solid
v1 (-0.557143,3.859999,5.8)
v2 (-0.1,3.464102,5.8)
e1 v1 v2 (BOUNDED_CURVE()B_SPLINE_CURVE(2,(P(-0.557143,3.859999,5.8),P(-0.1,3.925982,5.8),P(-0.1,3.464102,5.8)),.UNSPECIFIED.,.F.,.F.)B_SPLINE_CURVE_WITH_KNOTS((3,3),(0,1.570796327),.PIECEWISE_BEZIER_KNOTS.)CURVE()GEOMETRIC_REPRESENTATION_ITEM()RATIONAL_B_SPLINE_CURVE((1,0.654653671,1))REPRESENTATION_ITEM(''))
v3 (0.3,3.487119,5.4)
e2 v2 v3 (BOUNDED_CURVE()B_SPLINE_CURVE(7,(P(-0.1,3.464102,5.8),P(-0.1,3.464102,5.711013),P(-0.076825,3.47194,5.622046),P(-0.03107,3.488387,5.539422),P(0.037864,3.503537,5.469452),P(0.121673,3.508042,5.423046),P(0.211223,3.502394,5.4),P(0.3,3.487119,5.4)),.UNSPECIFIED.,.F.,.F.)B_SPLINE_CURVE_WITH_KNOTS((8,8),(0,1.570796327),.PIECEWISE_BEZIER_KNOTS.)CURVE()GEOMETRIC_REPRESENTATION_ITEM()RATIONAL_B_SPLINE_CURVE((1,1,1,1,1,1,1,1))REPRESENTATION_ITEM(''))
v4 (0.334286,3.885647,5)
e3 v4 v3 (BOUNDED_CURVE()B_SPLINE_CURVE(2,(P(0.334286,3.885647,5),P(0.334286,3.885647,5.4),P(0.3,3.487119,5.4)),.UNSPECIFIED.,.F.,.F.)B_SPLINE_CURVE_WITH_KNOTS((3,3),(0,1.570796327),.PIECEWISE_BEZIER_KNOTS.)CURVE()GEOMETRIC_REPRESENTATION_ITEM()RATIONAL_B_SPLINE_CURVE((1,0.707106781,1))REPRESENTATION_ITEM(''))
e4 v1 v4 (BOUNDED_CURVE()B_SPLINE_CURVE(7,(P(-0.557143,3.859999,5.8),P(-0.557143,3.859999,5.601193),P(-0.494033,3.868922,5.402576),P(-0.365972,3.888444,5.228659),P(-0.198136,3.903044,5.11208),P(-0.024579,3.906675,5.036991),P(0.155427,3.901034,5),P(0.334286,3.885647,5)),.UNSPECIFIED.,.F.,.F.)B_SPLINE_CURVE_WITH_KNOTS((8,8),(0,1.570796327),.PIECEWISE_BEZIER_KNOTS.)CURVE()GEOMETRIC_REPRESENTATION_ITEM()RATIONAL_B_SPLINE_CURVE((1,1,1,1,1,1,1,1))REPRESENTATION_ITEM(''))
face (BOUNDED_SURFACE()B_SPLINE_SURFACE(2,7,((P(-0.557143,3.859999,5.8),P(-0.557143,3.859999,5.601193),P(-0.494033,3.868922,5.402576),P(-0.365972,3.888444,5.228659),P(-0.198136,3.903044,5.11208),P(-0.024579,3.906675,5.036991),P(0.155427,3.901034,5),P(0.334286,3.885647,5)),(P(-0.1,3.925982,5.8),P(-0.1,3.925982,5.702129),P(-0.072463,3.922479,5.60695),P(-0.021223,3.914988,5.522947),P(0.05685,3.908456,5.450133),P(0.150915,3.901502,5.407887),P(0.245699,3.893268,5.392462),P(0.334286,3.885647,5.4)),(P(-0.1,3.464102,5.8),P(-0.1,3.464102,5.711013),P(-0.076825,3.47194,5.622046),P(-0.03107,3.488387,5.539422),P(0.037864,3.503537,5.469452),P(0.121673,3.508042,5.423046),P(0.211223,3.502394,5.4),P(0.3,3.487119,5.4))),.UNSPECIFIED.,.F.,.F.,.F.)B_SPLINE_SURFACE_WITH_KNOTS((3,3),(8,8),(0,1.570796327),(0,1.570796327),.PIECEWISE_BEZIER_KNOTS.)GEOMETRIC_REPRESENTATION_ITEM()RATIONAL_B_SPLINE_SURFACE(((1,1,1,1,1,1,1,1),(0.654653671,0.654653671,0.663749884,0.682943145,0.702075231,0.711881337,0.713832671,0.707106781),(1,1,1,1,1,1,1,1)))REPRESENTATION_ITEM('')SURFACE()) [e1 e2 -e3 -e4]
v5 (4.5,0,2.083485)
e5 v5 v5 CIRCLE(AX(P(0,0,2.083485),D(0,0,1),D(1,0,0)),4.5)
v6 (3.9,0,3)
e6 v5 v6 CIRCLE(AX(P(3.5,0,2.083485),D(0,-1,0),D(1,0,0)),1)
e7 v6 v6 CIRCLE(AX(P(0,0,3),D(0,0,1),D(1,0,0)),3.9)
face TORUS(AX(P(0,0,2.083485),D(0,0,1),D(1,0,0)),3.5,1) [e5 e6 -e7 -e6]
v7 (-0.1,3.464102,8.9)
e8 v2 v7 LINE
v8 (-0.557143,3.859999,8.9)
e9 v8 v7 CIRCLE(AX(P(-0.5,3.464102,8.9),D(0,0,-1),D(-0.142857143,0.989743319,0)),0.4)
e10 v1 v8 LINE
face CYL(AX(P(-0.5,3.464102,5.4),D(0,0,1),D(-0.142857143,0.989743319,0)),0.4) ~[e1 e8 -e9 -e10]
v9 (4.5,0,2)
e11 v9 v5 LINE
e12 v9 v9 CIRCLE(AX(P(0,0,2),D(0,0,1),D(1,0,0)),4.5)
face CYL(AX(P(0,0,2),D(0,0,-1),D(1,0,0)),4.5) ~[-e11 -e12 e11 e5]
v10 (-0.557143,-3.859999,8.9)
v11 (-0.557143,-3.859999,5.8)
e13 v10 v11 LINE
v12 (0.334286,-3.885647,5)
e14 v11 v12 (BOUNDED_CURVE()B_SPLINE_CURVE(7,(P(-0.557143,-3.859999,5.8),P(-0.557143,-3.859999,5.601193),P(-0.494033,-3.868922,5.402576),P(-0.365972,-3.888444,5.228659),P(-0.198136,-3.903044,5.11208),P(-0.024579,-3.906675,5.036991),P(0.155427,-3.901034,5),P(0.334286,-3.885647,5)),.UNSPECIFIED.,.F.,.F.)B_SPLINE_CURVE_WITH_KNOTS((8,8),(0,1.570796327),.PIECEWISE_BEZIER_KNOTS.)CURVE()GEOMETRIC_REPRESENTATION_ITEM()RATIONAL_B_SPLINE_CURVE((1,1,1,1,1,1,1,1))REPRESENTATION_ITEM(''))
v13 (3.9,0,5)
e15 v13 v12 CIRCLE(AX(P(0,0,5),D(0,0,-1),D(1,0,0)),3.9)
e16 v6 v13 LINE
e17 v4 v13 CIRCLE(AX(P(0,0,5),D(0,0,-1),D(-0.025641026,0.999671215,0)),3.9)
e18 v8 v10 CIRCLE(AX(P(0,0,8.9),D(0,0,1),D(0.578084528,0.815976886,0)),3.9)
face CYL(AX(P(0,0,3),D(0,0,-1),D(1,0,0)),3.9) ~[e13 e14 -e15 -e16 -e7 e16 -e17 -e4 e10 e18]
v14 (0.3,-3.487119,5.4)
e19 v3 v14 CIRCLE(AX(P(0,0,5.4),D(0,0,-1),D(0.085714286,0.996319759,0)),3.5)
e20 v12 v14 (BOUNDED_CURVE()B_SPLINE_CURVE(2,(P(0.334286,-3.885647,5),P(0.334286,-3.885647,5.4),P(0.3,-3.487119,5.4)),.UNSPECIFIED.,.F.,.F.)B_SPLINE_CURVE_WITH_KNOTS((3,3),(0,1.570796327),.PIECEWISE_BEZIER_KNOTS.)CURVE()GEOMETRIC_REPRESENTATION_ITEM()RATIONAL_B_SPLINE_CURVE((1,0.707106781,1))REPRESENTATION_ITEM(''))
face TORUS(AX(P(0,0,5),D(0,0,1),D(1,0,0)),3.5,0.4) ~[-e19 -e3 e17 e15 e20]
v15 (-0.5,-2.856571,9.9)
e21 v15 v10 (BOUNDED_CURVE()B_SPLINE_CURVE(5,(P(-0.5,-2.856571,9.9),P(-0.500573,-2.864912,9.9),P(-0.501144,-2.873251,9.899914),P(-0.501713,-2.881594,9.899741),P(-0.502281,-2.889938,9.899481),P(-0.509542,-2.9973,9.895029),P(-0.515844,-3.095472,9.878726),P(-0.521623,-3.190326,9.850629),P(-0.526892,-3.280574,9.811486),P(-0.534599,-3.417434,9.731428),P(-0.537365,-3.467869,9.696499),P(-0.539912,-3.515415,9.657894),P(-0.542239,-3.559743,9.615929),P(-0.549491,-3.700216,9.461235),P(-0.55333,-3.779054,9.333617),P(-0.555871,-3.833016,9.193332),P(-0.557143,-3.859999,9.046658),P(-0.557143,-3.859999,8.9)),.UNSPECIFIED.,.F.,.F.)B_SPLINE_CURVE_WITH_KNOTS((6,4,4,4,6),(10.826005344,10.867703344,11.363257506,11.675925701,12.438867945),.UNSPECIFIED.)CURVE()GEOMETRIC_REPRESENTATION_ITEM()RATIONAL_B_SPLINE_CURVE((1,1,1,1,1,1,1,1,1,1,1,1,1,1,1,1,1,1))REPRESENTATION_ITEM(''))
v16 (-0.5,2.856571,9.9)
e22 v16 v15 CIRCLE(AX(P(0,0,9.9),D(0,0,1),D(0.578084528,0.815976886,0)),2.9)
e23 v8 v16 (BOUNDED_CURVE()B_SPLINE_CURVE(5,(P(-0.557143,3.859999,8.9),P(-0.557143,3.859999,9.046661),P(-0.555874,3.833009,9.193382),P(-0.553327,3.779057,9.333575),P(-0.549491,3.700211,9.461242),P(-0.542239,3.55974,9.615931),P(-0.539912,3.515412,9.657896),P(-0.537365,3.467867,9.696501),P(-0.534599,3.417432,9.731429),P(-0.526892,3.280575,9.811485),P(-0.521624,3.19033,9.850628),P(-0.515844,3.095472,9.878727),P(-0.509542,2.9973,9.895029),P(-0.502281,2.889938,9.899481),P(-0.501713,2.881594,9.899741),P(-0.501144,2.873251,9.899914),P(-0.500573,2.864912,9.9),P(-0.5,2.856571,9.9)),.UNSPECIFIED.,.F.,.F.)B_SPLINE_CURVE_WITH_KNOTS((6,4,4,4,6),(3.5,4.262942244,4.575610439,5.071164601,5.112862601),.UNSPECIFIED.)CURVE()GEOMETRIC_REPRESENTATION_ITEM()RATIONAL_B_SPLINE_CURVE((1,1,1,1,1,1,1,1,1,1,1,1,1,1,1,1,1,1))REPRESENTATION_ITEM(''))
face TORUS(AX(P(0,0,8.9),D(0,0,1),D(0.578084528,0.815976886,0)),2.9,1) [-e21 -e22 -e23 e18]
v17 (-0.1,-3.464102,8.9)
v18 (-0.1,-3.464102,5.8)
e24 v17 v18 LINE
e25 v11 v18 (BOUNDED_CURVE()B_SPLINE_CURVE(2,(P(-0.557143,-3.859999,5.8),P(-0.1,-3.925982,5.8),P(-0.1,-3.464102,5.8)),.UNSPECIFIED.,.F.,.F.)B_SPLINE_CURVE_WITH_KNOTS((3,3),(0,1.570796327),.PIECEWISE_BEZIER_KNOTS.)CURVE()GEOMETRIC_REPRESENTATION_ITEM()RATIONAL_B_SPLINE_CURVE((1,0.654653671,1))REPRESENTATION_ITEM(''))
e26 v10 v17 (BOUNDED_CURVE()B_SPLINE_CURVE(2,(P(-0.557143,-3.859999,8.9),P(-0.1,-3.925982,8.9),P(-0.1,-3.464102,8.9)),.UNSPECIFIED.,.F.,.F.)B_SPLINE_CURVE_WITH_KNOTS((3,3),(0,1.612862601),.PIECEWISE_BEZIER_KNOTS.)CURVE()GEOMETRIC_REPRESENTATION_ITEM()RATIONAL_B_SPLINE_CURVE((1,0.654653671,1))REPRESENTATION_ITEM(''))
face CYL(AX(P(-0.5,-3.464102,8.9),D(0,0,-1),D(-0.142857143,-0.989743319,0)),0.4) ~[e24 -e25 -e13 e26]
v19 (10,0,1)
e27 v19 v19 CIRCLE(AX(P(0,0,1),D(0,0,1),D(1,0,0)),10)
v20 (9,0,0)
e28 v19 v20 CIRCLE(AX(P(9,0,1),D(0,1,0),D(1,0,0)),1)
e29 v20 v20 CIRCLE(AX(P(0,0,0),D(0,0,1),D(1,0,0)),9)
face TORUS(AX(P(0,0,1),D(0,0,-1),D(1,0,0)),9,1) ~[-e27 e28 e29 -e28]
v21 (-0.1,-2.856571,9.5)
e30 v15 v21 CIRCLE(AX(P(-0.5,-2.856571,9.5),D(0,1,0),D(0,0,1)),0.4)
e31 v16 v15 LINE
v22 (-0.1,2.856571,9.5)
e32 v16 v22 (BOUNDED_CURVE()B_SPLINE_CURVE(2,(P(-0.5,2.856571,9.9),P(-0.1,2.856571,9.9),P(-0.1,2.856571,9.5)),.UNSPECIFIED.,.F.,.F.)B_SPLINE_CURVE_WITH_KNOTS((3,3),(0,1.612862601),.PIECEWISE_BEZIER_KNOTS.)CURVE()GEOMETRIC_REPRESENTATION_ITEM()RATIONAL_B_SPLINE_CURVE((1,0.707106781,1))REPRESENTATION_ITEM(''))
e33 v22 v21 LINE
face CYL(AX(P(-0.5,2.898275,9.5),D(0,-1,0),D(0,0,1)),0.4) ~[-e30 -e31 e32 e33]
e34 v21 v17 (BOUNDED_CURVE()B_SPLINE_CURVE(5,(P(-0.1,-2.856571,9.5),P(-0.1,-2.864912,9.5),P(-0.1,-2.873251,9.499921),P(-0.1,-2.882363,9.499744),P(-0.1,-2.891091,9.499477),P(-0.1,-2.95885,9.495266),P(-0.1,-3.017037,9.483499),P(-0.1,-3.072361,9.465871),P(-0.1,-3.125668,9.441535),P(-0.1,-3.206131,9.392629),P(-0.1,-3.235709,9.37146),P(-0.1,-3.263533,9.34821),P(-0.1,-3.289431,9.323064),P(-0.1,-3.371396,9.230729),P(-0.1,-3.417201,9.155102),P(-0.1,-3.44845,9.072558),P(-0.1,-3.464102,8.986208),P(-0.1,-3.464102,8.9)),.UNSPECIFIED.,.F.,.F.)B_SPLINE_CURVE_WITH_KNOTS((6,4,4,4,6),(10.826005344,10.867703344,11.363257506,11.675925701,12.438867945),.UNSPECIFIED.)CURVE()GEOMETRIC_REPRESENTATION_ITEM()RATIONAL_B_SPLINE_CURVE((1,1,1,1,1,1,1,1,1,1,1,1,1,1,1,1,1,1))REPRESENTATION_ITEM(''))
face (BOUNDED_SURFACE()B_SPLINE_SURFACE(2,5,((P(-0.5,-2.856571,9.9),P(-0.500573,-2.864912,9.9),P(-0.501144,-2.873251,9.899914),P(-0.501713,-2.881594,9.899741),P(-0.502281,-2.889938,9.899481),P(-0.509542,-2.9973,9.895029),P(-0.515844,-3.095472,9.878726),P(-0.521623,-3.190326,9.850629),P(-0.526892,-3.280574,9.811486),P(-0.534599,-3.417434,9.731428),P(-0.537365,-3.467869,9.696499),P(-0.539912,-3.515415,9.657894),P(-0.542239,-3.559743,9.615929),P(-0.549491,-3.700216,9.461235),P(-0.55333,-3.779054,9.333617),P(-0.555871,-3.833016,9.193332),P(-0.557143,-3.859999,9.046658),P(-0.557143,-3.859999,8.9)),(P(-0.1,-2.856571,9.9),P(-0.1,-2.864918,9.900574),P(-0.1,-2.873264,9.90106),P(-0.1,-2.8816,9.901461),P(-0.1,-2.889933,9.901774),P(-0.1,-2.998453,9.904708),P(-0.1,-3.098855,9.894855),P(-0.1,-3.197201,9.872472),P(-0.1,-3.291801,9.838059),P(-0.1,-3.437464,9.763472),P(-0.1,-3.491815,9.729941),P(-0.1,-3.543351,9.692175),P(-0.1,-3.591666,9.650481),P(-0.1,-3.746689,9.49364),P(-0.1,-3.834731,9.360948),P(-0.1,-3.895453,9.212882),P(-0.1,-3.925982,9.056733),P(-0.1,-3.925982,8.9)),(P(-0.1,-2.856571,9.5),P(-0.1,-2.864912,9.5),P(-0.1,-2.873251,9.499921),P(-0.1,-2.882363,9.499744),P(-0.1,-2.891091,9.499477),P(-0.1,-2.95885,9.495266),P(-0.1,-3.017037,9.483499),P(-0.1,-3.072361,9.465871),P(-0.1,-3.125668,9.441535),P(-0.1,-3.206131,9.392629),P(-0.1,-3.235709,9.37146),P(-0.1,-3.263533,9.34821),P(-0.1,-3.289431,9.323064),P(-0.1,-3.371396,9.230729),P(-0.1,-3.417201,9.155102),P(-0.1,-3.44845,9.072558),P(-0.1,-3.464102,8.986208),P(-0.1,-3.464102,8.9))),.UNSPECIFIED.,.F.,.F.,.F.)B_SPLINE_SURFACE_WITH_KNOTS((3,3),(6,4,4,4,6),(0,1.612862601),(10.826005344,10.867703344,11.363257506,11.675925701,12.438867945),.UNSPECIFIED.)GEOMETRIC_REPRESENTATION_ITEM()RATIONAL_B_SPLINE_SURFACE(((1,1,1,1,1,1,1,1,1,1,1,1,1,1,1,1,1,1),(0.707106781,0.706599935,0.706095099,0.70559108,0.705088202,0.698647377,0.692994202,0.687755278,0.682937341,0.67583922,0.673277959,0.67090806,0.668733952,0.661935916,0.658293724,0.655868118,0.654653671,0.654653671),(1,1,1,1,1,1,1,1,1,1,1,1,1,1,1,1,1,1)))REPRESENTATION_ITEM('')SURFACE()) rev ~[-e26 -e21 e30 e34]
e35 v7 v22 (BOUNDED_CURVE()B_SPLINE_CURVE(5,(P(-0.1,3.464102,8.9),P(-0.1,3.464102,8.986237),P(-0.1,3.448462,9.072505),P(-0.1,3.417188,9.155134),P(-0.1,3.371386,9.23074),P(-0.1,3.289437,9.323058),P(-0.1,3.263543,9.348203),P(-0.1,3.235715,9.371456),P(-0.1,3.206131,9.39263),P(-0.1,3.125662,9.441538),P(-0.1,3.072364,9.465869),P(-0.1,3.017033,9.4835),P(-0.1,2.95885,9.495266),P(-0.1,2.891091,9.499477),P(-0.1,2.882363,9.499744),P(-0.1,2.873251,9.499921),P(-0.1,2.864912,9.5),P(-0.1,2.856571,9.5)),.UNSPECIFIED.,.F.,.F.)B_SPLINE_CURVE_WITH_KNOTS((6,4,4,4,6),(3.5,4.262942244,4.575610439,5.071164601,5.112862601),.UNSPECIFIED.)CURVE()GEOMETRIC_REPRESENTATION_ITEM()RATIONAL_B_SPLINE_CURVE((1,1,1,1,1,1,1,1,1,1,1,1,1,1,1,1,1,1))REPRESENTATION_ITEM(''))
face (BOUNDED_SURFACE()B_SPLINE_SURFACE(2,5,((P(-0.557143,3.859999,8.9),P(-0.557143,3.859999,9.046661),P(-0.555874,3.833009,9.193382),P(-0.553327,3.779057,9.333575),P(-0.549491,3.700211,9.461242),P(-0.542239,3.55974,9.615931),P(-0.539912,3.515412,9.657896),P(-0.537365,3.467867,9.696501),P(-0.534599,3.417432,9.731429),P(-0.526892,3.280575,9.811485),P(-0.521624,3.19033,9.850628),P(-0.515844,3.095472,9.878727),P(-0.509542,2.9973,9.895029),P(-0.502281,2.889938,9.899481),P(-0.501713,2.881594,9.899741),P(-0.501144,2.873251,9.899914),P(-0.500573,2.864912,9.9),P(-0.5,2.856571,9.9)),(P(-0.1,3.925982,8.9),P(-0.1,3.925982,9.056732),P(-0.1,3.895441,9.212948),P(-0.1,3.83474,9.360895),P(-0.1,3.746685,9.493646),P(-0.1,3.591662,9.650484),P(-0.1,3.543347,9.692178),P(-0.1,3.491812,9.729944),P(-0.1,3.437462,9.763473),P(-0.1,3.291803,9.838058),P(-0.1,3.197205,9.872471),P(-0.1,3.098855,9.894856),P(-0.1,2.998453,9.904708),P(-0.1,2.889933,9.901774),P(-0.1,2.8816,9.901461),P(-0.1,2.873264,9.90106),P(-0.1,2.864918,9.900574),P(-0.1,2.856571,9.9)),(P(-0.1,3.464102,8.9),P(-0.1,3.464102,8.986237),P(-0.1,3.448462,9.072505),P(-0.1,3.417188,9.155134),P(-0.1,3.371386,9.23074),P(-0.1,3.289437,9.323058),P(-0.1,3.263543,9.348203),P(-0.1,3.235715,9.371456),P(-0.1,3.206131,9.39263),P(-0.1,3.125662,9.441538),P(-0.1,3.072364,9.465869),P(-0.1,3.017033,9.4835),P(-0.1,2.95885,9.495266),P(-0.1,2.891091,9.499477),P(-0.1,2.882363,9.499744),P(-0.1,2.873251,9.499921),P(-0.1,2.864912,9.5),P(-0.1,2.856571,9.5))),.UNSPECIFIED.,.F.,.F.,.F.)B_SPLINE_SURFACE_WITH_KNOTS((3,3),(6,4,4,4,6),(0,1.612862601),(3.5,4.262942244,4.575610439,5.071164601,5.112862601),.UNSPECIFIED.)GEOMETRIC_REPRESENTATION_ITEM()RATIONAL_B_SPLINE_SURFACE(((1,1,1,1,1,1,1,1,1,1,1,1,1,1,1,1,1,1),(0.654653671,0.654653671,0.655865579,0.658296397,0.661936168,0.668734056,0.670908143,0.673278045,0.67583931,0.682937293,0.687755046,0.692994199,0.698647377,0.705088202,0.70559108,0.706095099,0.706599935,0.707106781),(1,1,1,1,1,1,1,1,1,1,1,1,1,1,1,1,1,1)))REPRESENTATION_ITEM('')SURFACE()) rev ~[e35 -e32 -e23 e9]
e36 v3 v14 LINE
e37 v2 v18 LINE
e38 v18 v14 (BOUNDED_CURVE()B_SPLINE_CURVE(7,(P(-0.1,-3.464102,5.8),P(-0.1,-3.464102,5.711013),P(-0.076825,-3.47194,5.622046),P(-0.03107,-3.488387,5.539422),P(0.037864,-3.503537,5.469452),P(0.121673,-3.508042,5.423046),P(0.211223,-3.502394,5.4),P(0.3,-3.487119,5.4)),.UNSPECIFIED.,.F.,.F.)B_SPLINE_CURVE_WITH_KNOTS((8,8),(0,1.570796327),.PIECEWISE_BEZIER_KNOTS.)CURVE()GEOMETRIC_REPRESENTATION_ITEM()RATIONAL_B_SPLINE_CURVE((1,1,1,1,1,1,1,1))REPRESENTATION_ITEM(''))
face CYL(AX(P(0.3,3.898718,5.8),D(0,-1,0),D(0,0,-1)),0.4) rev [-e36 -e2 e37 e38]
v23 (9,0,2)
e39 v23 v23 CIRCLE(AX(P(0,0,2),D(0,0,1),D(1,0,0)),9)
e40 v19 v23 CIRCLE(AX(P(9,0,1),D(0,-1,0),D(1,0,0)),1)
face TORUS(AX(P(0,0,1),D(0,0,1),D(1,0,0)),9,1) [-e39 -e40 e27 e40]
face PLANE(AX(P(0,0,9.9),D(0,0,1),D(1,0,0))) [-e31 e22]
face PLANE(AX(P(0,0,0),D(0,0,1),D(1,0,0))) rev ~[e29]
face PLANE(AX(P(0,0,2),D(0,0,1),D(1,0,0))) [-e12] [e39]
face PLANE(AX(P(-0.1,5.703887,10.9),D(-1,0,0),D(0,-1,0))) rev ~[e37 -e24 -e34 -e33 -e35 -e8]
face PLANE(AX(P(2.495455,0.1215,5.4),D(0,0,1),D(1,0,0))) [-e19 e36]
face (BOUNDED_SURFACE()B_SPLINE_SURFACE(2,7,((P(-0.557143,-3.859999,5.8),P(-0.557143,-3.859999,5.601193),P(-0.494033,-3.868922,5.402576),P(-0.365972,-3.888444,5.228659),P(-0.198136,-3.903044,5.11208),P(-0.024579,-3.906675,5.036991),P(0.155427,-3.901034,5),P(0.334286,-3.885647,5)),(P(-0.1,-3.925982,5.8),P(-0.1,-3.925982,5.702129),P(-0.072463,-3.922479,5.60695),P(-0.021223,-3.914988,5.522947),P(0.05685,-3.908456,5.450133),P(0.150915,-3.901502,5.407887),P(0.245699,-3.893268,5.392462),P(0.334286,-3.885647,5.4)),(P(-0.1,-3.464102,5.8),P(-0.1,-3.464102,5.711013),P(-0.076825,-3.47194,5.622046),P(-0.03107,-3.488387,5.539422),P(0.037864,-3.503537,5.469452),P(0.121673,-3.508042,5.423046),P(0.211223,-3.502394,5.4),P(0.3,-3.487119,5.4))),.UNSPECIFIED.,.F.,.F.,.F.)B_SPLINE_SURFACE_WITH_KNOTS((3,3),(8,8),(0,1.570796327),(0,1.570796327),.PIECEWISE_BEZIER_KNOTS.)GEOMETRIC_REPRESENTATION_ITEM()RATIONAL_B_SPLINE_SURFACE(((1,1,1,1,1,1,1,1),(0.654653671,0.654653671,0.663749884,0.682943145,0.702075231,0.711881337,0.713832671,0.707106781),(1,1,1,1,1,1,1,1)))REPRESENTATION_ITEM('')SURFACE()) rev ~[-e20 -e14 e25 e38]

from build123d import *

# Parameters (mm, degrees)
F0_R        = 10
F1_DEPTH    = 2
F2_R        = 4.5
F3_DEPTH    = 1
F4_R        = 3.9
F5_DEPTH    = 6.9
F8_DEPTH    = 5.5
F9_T8_ANGLE = 250.6318620022
F10_R       = 0.4


# Not quite as in the source:
# - a fillet or chamfer that OpenCascade refuses, or shapes differently, is made with other operations: its cross-section is extruded or revolved along the edge and cut away or added


with BuildPart() as f1:
    # F0 (on Top) → F1 (new body)
    with BuildSketch(Plane.XY):
        Circle(F0_R)
    extrude(amount=F1_DEPTH)

    # F2 (on face) → F3 (join)
    with BuildSketch(Plane.XY.offset(2)):
        Circle(F2_R)
    extrude(amount=F3_DEPTH)

    # F4 (on face) → F5 (join)
    with BuildSketch(Plane.XY.offset(3)):
        Circle(F4_R)
    extrude(amount=F5_DEPTH)

    # F7 (on offset) → F8 (cut, symmetric)
    with BuildSketch(Plane.XY.offset(10.9)):
        Polygon((5.1383636892, 5.7038869709), (-0.1, 5.7038869709), (-0.1, -5.6052659638), (5.1383636892, -5.3080837242), align=None)
    extrude(amount=F8_DEPTH, both=True, mode=Mode.SUBTRACT)

    # F9: fillet of radius 1 on 4 edges, made by hand

    # F9_s1 → F9_t2 (revolve, cut)
    with BuildSketch(Plane.XZ):
        with BuildLine():
            ThreePointArc((10, 1), (9.7071067812, 0.2928932188), (9, 0))
            Line((9, 0), (10, 0))
            Line((10, 0), (10, 1))
        make_face()
    revolve(axis=Axis((0, 0, 0), (0, 0, 1)), mode=Mode.SUBTRACT)

    # F9_s3 → F9_t4 (revolve, cut)
    with BuildSketch(Plane.XZ):
        with BuildLine():
            ThreePointArc((10, 1), (9.7071067812, 1.7071067812), (9, 2))
            Line((9, 2), (10, 2))
            Line((10, 2), (10, 1))
        make_face()
    revolve(axis=Axis((0, 0, 2), (0, 0, 1)), mode=Mode.SUBTRACT)

    # F9_s5 → F9_t6 (revolve, cut)
    with BuildSketch(Plane.XZ):
        with BuildLine():
            ThreePointArc((4.5, 2.083484861), (4.3366600265, 2.6312074185), (3.9, 3))
            Line((3.9, 3), (4.5, 3))
            Line((4.5, 3), (4.5, 2.083484861))
        make_face()
    revolve(axis=Axis((0, 0, 3), (0, 0, 1)), mode=Mode.SUBTRACT)

    # F9_s7 → F9_t8 (revolve, cut)
    with BuildSketch(Plane(origin=(0, 0, 0), x_dir=(0, 0, 1), z_dir=(0.8159768861, -0.5780845278, 0))):
        with BuildLine():
            ThreePointArc((8.9, -3.9), (9.6071067812, -3.6071067812), (9.9, -2.9))
            Line((9.9, -2.9), (9.9, -3.9))
            Line((9.9, -3.9), (8.9, -3.9))
        make_face()
    revolve(axis=Axis((0, 0, 9.9), (0, 0, 1)), revolution_arc=F9_T8_ANGLE, mode=Mode.SUBTRACT)

    # F10
    f10_edges = [f1.edges().sort_by_distance(p)[0] for p in [
        (-0.1, -3.898718, 7.15),
        (-0.1, 3.898718, 7.15),
        (-0.1, 3.605629, 9.607198),
        (-0.1, -3.605629, 9.607198),
        (-0.1, 0, 9.9),
        (2.722132, -2.792848, 5.4),
        (2.722132, 2.792848, 5.4),
        (-0.1, 0, 5.4),
    ]]
    fillet(f10_edges, radius=F10_R)


solid = f1.part
